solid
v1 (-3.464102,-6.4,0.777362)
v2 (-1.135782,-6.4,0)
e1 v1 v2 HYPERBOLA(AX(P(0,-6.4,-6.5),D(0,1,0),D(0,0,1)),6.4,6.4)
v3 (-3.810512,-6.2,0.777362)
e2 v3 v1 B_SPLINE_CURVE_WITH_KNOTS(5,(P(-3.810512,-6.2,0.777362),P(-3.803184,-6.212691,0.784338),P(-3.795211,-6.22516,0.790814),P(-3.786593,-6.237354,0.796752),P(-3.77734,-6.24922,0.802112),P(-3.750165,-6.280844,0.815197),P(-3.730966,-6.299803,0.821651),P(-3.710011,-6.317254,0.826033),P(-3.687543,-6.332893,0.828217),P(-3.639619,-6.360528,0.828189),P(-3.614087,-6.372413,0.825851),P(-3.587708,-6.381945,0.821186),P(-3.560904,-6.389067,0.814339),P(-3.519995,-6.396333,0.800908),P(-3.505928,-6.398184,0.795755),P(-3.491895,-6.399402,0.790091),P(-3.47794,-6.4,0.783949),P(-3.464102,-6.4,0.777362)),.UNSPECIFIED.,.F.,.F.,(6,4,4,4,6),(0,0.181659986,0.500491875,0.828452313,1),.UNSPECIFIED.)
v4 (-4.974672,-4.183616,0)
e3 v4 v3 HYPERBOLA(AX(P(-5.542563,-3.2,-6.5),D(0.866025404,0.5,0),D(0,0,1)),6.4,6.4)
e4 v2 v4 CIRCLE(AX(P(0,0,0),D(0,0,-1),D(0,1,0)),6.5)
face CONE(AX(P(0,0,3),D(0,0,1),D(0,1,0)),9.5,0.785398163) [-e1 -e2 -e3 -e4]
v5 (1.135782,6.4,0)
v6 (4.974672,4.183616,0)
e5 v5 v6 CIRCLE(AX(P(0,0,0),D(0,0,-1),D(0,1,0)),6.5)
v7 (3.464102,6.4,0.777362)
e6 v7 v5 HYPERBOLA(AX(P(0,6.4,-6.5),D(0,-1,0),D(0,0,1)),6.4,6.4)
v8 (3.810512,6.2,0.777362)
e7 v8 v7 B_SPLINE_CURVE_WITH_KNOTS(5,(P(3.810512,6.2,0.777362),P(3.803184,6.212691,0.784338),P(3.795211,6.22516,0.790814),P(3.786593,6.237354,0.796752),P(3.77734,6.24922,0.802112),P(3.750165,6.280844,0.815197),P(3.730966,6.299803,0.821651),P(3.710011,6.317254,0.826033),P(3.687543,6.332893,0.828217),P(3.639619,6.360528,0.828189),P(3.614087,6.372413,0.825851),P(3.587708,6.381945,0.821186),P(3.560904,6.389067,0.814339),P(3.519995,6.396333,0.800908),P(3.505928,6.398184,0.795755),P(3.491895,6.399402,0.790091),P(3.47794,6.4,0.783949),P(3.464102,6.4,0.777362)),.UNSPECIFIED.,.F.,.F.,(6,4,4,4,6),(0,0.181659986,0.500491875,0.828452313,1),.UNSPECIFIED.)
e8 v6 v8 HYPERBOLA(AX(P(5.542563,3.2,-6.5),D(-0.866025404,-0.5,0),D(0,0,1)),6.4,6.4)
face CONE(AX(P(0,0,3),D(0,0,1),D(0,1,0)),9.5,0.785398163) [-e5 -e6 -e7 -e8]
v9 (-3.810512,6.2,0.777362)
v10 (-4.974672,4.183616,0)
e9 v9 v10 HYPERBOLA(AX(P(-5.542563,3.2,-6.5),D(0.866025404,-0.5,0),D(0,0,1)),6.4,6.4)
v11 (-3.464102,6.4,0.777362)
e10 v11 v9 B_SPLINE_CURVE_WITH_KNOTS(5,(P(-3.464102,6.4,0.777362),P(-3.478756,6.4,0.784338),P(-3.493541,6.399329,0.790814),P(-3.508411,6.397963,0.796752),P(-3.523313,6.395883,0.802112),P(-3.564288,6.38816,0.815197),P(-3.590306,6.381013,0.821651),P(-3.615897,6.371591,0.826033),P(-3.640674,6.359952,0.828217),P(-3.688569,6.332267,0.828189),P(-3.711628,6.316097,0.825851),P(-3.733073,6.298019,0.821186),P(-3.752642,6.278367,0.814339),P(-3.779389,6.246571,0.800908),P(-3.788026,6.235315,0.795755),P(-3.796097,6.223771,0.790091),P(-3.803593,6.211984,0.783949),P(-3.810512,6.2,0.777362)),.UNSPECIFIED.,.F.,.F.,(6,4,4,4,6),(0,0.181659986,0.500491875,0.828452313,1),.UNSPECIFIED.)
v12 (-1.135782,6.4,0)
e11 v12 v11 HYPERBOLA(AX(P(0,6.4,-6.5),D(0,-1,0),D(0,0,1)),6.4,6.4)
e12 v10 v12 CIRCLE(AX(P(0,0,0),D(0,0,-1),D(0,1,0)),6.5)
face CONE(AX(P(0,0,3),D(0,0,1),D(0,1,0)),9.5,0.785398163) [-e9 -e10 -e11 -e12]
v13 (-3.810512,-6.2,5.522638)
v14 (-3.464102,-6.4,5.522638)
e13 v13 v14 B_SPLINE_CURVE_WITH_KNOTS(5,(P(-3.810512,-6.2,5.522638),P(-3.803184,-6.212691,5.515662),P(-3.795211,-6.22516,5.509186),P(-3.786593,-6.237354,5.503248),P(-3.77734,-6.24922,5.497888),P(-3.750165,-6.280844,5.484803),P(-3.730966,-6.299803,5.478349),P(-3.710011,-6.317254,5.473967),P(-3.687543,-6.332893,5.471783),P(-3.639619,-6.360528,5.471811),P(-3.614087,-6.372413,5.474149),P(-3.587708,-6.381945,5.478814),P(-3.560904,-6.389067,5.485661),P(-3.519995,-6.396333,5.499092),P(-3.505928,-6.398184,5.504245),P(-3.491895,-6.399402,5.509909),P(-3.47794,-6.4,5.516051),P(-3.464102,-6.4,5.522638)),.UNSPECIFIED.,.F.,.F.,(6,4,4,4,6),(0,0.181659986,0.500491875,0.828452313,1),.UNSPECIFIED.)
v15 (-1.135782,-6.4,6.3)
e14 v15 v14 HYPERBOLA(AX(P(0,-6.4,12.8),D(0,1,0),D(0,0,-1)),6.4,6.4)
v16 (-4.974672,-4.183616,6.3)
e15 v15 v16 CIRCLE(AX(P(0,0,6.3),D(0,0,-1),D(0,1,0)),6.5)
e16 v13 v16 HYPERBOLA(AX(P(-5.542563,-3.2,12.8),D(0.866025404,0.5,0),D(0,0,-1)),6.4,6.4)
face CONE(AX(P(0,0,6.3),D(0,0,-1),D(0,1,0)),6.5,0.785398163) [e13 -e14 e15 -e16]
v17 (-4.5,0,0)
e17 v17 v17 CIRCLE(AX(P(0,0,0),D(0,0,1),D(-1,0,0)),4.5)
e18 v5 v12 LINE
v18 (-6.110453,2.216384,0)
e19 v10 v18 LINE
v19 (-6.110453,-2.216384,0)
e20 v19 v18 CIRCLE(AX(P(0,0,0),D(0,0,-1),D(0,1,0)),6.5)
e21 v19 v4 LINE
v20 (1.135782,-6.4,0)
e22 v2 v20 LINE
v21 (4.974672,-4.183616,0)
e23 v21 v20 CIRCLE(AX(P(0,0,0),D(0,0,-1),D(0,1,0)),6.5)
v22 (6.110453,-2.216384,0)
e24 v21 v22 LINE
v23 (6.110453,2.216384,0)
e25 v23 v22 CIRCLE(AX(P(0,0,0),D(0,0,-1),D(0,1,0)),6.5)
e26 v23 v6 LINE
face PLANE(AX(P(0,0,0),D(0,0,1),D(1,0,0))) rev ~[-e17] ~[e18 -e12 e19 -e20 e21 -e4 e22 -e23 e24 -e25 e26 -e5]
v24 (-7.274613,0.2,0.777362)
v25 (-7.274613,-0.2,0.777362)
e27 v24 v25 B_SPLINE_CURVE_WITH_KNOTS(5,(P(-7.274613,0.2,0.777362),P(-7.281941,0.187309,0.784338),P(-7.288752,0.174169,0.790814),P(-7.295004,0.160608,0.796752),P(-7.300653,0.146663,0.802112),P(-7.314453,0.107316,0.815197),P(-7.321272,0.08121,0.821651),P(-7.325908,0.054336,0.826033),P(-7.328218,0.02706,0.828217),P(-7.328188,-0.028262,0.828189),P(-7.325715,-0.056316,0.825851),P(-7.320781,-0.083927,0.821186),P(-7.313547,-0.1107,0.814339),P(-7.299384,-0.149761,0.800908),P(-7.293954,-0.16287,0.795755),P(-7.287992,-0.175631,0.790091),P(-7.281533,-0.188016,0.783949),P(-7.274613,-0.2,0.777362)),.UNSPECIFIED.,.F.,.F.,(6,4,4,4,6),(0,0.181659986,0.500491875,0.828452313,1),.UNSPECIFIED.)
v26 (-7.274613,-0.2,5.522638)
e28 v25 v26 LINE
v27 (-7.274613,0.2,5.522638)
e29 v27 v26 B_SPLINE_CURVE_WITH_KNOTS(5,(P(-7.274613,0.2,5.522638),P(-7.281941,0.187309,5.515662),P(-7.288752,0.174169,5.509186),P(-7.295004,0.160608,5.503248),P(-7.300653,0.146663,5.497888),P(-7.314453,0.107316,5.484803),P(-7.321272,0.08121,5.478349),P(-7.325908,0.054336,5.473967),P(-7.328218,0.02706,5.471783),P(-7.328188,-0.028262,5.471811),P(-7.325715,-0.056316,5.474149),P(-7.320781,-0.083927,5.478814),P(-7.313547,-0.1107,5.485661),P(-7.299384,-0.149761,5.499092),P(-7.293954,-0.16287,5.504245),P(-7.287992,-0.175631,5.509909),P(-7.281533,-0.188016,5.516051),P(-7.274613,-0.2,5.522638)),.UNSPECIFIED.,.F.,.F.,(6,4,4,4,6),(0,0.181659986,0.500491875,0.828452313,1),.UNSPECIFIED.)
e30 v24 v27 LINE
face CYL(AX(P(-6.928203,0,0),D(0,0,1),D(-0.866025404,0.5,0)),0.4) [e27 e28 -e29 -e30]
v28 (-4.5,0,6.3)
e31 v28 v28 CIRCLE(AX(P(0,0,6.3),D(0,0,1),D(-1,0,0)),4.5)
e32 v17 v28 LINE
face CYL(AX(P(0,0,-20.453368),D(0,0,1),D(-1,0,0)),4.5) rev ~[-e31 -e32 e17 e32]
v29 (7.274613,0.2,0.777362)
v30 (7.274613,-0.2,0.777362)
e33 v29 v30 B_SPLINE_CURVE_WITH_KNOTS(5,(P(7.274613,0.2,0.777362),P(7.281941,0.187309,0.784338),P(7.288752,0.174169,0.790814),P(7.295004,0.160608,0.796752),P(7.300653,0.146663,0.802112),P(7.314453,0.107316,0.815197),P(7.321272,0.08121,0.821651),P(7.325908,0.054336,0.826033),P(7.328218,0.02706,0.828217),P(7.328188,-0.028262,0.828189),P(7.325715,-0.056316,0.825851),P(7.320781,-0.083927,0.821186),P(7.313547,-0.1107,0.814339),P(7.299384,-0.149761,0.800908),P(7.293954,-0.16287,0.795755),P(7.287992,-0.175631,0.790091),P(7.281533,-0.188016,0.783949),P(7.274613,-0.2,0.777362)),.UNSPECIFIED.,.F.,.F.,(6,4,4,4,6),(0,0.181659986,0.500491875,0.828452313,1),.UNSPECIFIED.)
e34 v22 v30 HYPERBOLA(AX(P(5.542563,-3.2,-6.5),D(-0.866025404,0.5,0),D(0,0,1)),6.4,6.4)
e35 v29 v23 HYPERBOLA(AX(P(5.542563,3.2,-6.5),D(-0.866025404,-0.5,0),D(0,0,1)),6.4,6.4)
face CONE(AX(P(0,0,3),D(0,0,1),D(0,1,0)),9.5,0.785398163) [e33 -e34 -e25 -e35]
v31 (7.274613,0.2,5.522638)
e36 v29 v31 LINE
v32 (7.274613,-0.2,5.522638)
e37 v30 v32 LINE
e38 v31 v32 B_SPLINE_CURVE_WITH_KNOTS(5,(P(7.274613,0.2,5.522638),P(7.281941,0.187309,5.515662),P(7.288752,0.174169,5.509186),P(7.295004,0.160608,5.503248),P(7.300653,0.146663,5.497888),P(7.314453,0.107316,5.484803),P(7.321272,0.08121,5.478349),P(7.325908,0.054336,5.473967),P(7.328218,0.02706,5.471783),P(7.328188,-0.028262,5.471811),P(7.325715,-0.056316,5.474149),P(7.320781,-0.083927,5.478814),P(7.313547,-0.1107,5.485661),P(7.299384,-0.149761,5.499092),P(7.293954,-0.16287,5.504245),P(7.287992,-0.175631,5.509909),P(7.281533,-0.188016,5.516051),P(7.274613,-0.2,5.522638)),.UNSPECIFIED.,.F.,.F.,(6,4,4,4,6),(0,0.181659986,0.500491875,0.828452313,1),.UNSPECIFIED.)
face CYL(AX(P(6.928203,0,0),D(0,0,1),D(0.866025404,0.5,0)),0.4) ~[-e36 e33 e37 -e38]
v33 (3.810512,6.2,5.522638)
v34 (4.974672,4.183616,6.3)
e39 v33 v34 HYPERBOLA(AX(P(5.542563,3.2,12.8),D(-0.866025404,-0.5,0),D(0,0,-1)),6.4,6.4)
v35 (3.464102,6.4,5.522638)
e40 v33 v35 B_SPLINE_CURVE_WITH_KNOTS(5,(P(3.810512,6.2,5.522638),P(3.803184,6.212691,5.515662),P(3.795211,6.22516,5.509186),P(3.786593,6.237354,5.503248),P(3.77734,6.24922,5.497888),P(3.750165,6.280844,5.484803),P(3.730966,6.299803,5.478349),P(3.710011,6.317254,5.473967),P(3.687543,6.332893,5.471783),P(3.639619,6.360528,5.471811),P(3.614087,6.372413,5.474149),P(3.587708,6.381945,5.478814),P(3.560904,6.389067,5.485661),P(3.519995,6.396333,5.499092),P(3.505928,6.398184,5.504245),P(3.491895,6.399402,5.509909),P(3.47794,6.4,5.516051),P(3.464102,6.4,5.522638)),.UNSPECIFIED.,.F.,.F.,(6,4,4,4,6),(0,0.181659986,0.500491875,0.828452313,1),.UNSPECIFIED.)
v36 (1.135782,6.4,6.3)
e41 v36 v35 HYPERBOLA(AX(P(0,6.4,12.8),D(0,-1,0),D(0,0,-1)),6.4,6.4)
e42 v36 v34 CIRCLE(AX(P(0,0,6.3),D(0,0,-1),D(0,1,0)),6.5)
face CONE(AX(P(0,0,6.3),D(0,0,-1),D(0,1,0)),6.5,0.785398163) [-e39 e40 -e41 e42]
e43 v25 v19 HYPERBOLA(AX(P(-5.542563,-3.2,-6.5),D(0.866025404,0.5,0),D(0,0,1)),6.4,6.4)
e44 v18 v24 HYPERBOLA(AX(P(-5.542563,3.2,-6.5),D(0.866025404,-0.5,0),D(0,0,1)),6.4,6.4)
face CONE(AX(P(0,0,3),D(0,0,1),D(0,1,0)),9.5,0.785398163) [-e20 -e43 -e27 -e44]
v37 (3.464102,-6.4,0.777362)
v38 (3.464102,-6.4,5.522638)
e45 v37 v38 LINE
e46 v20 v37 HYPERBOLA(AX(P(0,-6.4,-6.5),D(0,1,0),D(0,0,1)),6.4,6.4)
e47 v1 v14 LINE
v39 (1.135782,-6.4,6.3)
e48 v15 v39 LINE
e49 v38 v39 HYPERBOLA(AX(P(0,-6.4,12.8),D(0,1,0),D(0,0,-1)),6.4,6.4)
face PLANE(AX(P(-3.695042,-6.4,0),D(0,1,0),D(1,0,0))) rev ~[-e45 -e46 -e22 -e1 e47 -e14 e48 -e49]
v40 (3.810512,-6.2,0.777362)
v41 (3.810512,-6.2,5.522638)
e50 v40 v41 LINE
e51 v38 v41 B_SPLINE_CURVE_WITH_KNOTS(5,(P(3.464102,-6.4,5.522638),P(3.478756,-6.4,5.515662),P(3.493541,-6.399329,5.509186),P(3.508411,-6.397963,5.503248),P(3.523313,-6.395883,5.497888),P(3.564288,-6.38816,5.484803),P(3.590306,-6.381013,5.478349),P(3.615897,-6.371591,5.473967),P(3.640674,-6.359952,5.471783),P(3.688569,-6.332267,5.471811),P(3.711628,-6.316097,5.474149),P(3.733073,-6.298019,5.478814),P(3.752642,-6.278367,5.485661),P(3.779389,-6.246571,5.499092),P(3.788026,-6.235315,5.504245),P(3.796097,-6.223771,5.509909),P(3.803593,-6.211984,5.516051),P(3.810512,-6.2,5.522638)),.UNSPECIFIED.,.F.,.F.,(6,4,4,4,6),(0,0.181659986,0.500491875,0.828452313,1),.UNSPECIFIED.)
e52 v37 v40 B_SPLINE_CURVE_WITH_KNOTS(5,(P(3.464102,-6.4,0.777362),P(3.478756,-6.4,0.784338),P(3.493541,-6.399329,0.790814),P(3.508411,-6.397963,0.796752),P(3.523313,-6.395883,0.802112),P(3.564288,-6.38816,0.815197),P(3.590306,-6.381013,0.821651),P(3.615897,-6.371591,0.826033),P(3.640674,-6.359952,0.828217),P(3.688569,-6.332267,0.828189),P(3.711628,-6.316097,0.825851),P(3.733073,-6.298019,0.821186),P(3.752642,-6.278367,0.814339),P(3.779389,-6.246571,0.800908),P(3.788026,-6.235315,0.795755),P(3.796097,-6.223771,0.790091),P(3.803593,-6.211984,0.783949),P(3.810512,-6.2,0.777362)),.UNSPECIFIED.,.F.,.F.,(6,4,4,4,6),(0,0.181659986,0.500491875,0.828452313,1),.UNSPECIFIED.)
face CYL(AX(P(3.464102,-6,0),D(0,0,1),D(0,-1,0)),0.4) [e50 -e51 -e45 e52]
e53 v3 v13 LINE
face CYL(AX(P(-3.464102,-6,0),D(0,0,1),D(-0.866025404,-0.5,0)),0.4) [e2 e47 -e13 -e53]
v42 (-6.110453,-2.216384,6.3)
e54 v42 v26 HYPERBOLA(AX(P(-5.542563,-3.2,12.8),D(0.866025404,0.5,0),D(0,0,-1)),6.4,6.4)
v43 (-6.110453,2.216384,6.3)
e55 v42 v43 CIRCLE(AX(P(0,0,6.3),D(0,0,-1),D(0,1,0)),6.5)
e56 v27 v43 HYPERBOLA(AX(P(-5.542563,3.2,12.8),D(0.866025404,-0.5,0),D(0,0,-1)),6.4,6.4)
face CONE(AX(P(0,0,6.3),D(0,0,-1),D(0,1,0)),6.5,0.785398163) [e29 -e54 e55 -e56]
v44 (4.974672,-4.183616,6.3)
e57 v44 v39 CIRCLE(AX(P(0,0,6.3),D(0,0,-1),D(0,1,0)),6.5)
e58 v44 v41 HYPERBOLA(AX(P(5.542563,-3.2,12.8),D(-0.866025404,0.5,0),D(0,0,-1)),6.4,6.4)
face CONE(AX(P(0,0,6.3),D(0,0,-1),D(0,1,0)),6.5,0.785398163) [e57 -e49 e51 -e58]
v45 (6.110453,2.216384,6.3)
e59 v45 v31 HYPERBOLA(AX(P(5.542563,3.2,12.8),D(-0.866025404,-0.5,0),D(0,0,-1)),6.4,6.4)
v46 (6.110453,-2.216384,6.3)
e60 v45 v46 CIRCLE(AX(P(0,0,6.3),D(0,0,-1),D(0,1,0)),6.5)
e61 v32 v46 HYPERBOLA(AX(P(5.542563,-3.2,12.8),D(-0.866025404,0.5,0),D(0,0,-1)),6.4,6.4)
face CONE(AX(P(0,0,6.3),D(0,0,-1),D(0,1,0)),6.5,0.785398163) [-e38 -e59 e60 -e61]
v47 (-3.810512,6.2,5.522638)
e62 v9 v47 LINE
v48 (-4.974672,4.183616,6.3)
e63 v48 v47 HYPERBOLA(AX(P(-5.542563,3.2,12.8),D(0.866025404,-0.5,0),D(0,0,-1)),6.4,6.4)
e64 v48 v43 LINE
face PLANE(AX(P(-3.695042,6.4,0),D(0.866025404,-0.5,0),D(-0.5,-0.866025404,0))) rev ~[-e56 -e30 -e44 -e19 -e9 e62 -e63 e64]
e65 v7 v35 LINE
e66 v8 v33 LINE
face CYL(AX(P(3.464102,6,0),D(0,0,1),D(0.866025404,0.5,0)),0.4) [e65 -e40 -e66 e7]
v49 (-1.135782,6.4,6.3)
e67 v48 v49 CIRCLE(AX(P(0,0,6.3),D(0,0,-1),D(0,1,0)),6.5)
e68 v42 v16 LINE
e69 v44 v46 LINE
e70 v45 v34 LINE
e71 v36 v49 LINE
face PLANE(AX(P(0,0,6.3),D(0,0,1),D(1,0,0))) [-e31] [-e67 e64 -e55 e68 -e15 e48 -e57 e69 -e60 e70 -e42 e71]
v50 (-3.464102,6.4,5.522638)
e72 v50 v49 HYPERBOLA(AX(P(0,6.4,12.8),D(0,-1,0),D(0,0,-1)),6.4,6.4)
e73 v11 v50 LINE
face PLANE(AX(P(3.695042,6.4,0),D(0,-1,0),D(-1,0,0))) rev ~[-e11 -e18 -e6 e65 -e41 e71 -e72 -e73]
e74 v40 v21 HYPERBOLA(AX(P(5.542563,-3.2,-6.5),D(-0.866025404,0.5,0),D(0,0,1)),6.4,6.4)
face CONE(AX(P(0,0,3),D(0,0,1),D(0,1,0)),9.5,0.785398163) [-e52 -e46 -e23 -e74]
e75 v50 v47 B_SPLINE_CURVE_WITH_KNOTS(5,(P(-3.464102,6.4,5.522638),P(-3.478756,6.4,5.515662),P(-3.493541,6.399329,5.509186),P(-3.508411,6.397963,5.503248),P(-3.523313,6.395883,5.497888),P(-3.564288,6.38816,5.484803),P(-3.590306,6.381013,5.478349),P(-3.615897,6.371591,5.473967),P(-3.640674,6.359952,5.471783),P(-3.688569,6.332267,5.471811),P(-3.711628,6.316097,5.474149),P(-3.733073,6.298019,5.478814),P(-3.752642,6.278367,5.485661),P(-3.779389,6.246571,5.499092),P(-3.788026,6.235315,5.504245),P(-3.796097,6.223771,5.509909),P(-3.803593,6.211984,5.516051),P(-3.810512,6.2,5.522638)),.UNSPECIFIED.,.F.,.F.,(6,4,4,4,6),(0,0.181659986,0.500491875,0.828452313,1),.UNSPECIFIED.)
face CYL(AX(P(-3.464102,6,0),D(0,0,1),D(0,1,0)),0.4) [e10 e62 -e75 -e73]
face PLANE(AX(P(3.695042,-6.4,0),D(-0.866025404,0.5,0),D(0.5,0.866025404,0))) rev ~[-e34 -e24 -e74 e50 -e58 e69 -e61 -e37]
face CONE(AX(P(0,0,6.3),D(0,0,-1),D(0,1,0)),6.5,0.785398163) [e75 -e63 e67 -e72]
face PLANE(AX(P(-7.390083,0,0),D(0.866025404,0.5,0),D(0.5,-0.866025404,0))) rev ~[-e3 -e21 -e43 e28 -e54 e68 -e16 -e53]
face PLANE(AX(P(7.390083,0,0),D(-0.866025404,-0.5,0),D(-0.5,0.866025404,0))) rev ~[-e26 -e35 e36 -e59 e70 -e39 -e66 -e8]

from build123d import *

# Parameters (mm, degrees)
F1_DEPTH = 6.3
F2_R     = 0.4
F5_D     = 9


with BuildPart() as f1:
    # F0 (on Top) → F1 (new body)
    with BuildSketch(Plane.XY):
        Polygon((7.3900834456, 0), (3.6950417228, 6.4), (-3.6950417228, 6.4), (-7.3900834456, 0), (-3.6950417228, -6.4), (3.6950417228, -6.4), align=None)
    extrude(amount=F1_DEPTH)

    # F2
    f2_edges = [f1.edges().sort_by_distance(p)[0] for p in [
        (-3.695042, -6.4, 3.15),
        (3.695042, -6.4, 3.15),
        (7.390083, 0, 3.15),
        (3.695042, 6.4, 3.15),
        (-3.695042, 6.4, 3.15),
        (-7.390083, 0, 3.15),
    ]]
    fillet(f2_edges, radius=F2_R)

    # F3 (on Right) → F4 (revolve, cut)
    with BuildSketch(Plane.YZ):
        Polygon((9.5, 6.3), (6.5, 6.3), (9.5, 3.3), align=None)
        Polygon((9.5, 3), (6.5, 0), (9.5, 0), align=None)
    revolve(axis=Axis((0, 0, 10.4480586015), (0, 0, -1)), mode=Mode.SUBTRACT)

    # F5 (through all)
    with Locations(Plane(origin=(0, 0, 0), x_dir=(1, 0, 0), z_dir=(0, 0, -1))):
        with Locations((0, 0)):
            Hole(F5_D / 2)


solid = f1.part
